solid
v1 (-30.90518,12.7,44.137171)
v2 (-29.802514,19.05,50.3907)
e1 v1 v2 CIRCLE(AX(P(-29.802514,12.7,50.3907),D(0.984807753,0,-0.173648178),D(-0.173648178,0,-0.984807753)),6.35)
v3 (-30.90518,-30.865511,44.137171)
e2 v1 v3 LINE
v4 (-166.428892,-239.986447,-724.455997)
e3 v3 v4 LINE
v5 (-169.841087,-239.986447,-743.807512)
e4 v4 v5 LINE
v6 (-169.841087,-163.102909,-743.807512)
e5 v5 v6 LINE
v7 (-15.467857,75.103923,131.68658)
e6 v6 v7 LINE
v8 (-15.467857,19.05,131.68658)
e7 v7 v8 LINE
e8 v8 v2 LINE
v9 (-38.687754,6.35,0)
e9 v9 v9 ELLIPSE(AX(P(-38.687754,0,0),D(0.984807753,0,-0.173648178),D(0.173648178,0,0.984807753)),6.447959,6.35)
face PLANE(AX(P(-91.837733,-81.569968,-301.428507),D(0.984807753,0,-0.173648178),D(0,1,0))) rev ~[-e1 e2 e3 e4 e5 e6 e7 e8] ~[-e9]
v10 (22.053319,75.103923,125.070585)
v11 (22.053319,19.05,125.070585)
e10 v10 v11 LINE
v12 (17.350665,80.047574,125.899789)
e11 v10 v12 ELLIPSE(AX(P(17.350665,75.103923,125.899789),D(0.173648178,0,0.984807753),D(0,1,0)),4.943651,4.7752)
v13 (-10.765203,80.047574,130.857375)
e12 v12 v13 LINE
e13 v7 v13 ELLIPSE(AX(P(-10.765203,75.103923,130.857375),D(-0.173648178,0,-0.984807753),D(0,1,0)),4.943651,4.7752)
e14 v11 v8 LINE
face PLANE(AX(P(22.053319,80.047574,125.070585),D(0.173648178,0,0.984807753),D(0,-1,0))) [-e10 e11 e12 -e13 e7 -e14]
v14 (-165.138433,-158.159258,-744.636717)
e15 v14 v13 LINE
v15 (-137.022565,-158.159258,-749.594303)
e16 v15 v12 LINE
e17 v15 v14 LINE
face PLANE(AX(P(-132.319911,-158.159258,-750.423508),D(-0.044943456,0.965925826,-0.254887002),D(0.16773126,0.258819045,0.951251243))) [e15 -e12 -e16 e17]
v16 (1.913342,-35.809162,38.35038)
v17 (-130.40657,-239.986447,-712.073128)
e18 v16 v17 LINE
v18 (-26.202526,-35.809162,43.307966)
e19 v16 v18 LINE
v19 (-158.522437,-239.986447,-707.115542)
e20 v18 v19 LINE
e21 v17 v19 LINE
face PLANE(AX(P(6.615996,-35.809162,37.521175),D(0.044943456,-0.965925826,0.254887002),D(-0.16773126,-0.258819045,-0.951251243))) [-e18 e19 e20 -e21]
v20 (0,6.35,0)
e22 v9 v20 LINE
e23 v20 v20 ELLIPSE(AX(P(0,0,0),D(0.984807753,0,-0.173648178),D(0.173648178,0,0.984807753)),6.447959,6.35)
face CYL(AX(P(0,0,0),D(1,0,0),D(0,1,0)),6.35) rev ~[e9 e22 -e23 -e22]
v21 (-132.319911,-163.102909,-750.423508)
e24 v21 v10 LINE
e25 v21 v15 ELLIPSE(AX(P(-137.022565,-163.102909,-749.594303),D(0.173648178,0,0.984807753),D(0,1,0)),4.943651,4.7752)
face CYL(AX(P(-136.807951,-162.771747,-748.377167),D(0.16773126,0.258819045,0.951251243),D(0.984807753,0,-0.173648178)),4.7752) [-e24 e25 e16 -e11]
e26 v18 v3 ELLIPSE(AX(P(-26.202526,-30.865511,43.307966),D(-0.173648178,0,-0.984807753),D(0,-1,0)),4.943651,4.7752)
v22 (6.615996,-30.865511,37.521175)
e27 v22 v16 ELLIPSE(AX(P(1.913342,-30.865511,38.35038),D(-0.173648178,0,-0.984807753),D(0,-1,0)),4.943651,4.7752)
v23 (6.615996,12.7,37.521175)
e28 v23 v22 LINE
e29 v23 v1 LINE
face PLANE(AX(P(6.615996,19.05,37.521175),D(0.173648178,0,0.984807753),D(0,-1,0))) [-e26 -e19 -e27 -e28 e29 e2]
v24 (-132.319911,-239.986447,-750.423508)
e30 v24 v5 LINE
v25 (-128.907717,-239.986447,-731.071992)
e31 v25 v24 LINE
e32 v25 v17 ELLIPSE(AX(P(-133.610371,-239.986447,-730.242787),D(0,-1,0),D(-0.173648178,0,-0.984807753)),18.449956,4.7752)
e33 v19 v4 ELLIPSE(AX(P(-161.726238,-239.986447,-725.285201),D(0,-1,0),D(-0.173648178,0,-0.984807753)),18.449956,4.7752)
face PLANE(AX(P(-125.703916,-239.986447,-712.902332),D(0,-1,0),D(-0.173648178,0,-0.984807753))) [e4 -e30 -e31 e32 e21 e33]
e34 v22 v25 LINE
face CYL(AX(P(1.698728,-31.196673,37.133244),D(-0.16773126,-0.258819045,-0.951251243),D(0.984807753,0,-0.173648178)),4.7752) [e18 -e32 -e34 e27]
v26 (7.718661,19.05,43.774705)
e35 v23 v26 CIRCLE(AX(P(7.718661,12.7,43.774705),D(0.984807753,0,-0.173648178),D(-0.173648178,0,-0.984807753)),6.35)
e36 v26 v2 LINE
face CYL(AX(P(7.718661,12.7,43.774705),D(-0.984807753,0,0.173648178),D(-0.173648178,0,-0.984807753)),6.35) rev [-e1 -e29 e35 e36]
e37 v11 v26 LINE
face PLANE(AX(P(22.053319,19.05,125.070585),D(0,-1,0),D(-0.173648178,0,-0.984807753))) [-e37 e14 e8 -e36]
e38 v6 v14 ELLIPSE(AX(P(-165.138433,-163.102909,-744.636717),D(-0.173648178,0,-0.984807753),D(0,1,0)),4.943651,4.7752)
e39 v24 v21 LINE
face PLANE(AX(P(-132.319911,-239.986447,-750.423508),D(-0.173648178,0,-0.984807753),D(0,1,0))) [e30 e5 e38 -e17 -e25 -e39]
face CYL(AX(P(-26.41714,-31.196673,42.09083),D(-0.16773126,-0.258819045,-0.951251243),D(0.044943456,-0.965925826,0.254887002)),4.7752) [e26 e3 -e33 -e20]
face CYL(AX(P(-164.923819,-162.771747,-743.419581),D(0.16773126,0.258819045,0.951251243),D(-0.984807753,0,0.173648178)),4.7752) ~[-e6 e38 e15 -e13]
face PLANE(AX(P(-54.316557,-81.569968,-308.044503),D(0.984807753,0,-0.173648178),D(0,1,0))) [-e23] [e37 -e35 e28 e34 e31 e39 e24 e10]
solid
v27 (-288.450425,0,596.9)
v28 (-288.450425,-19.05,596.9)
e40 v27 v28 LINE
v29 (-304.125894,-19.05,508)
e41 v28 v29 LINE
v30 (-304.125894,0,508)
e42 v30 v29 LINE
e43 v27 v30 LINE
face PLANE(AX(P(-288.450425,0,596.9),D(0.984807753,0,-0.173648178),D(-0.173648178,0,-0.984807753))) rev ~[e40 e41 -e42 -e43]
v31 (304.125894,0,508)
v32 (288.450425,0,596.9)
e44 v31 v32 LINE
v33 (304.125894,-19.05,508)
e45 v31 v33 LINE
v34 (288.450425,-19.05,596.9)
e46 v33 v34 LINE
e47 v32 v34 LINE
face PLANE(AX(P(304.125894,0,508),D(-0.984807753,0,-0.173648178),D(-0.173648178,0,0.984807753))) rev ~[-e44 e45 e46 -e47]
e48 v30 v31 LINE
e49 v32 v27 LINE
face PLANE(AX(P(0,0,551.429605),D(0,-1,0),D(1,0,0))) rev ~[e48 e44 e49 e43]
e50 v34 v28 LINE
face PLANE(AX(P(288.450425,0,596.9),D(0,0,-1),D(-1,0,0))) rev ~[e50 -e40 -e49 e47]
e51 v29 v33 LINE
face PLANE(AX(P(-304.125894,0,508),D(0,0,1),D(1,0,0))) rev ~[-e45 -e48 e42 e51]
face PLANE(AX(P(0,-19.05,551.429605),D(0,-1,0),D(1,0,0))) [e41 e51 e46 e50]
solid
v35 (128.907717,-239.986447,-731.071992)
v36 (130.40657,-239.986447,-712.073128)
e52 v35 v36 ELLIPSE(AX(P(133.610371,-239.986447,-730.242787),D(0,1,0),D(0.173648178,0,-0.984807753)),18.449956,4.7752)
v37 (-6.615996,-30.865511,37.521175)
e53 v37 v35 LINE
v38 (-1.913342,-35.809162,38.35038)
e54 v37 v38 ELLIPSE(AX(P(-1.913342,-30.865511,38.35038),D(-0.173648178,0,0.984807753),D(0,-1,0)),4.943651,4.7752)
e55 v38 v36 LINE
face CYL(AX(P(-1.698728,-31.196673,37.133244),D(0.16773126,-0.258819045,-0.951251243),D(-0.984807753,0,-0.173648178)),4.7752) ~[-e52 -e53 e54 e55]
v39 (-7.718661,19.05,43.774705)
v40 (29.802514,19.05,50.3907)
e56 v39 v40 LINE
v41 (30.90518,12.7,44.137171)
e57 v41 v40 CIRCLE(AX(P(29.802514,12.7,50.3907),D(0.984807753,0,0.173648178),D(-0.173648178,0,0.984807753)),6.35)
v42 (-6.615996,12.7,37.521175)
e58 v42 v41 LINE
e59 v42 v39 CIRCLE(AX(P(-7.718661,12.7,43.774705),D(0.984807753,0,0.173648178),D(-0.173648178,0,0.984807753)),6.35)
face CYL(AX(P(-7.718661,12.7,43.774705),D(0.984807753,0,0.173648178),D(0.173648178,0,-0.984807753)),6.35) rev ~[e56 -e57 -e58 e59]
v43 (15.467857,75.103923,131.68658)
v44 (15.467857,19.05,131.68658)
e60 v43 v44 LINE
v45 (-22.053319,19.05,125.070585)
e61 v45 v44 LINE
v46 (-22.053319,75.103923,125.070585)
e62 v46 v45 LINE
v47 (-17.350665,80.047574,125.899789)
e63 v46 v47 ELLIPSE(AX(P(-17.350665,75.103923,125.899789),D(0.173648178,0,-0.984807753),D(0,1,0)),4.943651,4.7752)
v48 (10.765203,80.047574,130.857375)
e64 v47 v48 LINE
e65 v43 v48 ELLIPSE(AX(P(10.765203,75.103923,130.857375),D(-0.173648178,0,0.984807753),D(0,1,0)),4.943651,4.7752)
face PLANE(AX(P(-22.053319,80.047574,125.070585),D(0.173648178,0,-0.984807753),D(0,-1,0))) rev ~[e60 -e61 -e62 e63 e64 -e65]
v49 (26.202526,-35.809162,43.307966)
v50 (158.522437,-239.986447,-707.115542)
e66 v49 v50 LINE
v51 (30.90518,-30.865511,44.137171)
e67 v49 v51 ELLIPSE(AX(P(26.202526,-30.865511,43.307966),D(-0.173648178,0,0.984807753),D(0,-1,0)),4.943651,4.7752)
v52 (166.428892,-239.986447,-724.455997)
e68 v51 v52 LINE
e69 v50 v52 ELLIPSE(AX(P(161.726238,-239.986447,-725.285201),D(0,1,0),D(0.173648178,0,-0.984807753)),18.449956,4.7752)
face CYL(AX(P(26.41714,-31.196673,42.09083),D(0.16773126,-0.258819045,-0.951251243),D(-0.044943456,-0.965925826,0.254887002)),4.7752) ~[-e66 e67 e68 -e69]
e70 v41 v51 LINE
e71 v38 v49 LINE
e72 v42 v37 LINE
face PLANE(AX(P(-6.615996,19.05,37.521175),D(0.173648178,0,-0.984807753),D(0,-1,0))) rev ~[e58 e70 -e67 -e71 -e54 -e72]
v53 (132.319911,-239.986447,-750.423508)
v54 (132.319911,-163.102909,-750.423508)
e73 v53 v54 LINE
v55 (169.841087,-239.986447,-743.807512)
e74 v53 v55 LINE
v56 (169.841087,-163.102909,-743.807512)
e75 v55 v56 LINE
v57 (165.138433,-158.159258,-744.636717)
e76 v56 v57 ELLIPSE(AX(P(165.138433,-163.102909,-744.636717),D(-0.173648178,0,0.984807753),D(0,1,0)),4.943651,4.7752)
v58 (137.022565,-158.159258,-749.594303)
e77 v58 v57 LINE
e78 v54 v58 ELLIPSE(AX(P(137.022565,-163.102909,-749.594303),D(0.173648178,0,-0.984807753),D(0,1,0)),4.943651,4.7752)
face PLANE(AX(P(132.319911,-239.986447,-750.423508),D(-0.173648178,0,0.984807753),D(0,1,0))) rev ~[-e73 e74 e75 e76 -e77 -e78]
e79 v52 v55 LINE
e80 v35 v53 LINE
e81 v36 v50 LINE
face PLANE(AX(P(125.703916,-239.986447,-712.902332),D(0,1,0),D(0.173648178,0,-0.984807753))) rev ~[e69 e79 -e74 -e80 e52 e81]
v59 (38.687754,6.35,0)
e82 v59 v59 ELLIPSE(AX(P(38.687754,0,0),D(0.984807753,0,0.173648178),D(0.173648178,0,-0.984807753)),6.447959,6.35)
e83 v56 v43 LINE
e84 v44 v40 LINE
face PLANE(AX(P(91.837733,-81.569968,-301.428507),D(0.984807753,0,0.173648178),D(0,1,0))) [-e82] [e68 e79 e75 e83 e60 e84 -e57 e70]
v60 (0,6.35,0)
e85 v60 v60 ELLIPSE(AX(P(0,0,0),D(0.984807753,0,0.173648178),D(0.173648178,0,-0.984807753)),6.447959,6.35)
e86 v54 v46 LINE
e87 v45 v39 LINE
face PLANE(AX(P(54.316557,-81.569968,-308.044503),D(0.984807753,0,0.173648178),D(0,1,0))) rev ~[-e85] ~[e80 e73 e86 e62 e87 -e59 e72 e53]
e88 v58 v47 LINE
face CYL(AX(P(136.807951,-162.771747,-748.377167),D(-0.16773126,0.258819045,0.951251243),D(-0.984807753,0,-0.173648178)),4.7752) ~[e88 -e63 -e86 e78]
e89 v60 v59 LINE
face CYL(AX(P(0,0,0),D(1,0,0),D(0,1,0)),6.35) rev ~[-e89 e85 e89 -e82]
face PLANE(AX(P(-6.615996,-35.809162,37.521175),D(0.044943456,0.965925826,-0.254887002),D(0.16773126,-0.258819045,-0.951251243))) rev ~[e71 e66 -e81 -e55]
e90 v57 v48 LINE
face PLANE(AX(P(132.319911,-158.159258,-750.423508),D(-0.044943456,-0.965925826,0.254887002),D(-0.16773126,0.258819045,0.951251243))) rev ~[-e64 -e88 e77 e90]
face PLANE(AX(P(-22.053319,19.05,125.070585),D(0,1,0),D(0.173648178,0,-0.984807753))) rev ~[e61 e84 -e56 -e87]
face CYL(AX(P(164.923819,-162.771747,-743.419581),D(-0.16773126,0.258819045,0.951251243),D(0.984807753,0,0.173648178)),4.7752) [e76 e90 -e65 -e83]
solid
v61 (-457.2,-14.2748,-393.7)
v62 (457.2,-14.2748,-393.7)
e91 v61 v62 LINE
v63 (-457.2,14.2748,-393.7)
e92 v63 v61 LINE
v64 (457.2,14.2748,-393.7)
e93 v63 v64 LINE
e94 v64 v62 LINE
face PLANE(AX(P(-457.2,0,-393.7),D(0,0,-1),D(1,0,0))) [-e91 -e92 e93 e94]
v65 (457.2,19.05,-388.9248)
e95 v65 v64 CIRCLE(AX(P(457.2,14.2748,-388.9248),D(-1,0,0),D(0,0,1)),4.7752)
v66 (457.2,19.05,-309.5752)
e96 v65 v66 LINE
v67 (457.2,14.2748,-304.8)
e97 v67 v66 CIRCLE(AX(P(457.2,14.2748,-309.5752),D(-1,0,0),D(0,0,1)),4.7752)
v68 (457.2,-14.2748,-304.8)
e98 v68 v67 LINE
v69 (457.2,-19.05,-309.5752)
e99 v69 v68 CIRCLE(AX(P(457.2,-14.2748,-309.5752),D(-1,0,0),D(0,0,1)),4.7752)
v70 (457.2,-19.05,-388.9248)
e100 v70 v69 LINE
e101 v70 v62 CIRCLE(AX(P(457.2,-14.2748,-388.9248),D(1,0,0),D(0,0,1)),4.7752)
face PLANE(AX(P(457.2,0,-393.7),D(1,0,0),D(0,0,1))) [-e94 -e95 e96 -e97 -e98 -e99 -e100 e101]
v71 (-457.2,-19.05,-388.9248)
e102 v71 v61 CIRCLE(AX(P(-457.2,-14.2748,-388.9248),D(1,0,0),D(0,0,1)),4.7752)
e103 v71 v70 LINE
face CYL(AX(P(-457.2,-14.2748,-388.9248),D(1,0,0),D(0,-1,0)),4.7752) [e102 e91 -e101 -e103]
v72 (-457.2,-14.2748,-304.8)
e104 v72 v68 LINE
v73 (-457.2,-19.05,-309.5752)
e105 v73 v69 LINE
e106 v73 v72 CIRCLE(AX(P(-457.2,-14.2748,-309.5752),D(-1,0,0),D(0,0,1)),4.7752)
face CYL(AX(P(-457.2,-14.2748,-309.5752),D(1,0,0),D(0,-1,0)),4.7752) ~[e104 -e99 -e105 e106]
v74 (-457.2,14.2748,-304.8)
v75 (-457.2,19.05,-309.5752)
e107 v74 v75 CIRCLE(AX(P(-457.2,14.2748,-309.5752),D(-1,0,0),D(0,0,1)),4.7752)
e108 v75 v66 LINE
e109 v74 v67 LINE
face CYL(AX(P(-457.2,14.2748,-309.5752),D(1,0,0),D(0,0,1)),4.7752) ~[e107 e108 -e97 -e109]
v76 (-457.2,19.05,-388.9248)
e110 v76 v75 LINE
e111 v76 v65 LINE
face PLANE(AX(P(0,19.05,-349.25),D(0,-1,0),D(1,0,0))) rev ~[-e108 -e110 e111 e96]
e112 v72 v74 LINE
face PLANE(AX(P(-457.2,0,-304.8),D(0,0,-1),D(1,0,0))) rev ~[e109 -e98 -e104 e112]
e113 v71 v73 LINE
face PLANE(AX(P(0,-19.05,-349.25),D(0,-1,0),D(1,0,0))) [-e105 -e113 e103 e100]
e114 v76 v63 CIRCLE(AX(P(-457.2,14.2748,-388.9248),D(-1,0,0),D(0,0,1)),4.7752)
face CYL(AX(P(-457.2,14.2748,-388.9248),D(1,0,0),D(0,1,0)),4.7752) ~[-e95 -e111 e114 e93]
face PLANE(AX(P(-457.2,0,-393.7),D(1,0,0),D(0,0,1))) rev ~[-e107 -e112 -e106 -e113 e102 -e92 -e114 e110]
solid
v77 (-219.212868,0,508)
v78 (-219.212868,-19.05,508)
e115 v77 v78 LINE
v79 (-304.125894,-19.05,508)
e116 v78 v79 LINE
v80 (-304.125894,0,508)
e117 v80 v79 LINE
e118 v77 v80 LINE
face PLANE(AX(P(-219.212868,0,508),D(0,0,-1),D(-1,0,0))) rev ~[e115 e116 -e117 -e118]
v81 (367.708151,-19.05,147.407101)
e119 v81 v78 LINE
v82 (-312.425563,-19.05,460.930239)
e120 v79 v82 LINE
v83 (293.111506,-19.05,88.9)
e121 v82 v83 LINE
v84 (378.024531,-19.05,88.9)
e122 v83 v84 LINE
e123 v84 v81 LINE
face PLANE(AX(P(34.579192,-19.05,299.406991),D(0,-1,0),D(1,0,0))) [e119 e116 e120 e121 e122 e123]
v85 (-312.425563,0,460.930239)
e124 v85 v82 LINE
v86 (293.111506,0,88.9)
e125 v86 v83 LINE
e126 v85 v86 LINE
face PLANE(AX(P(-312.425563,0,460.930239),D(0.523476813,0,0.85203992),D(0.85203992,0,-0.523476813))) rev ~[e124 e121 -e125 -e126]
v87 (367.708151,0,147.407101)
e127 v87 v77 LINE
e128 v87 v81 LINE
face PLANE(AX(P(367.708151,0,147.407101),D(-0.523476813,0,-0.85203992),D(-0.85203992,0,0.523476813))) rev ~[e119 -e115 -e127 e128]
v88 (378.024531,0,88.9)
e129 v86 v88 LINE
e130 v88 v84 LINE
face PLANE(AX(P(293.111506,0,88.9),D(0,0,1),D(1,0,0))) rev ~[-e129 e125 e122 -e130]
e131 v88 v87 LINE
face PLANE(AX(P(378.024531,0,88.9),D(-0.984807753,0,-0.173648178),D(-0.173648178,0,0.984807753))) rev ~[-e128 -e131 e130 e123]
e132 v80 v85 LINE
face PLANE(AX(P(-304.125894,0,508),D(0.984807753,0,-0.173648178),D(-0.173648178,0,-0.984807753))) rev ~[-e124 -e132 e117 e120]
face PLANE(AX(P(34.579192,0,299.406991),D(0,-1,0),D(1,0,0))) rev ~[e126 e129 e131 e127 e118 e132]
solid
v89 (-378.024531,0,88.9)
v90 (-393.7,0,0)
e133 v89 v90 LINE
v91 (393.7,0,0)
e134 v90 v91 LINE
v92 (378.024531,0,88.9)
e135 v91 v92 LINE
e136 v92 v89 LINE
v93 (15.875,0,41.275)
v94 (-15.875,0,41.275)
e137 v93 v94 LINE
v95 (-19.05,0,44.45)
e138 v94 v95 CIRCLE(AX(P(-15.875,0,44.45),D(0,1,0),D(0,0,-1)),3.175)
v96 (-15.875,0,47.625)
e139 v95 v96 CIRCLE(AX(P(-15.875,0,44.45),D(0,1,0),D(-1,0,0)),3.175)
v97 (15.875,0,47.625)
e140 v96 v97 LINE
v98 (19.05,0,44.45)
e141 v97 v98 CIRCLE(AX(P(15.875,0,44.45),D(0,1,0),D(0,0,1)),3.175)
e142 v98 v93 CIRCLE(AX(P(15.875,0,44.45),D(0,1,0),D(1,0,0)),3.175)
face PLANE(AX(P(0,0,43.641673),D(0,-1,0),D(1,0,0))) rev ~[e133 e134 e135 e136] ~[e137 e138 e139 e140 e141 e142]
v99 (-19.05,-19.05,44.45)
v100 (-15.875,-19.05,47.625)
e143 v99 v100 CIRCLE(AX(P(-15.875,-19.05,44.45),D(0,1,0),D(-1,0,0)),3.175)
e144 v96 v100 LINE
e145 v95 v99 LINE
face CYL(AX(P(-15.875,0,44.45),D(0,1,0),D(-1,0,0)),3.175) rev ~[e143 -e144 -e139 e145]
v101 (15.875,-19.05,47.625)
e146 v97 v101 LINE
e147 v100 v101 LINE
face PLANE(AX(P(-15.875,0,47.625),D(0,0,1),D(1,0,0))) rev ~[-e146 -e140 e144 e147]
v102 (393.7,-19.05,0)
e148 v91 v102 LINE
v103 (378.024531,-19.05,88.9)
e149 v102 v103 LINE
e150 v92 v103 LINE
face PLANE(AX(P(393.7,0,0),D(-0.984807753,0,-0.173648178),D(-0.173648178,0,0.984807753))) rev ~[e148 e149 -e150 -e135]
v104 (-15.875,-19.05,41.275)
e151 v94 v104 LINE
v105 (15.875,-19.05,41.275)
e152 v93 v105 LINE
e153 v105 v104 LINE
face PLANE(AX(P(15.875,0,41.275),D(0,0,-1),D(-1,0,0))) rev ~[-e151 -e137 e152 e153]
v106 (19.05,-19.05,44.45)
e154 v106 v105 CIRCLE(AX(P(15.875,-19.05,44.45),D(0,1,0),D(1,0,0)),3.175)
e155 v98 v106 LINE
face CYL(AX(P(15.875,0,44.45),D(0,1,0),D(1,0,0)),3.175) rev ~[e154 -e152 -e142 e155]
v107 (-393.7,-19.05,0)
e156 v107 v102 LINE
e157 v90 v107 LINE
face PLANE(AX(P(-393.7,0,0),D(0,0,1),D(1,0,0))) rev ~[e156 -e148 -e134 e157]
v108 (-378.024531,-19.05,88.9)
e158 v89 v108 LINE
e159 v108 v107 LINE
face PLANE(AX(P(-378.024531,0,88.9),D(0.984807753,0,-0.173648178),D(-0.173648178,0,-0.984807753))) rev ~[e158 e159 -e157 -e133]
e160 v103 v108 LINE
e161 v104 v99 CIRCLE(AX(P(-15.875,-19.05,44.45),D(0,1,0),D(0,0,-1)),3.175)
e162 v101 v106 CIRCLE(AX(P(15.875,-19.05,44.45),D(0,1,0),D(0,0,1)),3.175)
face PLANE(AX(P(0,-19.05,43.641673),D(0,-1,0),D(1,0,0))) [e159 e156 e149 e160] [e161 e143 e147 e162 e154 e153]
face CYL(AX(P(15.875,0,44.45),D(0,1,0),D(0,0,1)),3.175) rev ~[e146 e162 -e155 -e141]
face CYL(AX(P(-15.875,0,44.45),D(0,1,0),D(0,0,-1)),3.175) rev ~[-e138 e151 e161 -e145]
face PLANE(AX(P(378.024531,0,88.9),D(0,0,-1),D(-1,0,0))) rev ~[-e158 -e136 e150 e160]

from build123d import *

# Parameters (mm, degrees)
F5_DEPTH      = 38.1
F6_DEPTH      = 38.1
F7_R          = 6.35
F7_2_R        = 6.35
F8_R          = 6.35
F9_DEPTH      = 169.842086772
F9_DEPTH_BACK = 169.842086772
F11_DEPTH     = 19.05
F13_DEPTH     = 19.05
F15_DEPTH     = 19.05
F16_W         = 914.4
F16_H         = 88.9
F17_DEPTH     = 19.05
F18_R         = 4.7752
F18_2_R       = 4.7752
F18_3_R       = 4.7752


with BuildPart() as f5:
    # F3 (on line) → F5 (new body)
    with BuildSketch(Plane(origin=(0, 0, 0), x_dir=(0, 1, 0), z_dir=(0.984807753, 0, 0.1736481777))):
        Polygon((19.05, 38.1), (-35.8091619876, 38.1), (-239.9864466201, -723.9), (-239.9864466201, -762), (-158.1592584133, -762), (80.047573658, 127), (19.05, 127), align=None)
    extrude(amount=F5_DEPTH)

    # F7
    f7_edges = [f5.edges().sort_by_distance(p)[0] for p in [
        (12.144592, 19.05, 40.829173),
    ]]
    fillet(f7_edges, radius=F7_R)


with BuildPart() as f6:
    # F4 (on line) → F6 (new body)
    with BuildSketch(Plane(origin=(0, 0, 0), x_dir=(0, 1, 0), z_dir=(0.984807753, 0, -0.1736481777))):
        Polygon((19.05, 38.1), (-35.8091619876, 38.1), (-239.9864466201, -723.9), (-239.9864466201, -762), (-158.1592584133, -762), (80.047573658, 127), (19.05, 127), align=None)
    extrude(amount=-F6_DEPTH)

    # F7#2
    f7_2_edges = [f6.edges().sort_by_distance(p)[0] for p in [
        (-12.144592, 19.05, 40.829173),
    ]]
    fillet(f7_2_edges, radius=F7_2_R)


with BuildPart() as f9_tool:
    # F8 (on Right) → F9 (new body, two sides)
    with BuildSketch(Plane.YZ) as f9_sk:
        Circle(F8_R)
    extrude(amount=F9_DEPTH)
    extrude(f9_sk.sketch, amount=-F9_DEPTH_BACK)


with BuildPart() as f5_1:
    add(f5.part)

    # F9: cut by f9_tool
    add(f9_tool.part, mode=Mode.SUBTRACT)

    # F18
    f18_edges = [f5_1.edges().sort_by_distance(p)[0] for p in [
        (97.065136, -137.897804, -331.074583),
        (59.54396, -137.897804, -337.690579),
        (92.654472, -39.055842, -306.060466),
        (55.133296, -39.055842, -312.676462),
        (11.041926, 19.05, 47.082702),
    ]]
    fillet(f18_edges, radius=F18_R)


with BuildPart() as f6_1:
    add(f6.part)

    # F9: cut by f9_tool
    add(f9_tool.part, mode=Mode.SUBTRACT)

    # F18#2
    f18_2_edges = [f6_1.edges().sort_by_distance(p)[0] for p in [
        (-59.54396, -137.897804, -337.690579),
        (-55.133296, -39.055842, -312.676462),
        (-97.065136, -137.897804, -331.074583),
        (-92.654472, -39.055842, -306.060466),
    ]]
    fillet(f18_2_edges, radius=F18_2_R)


with BuildPart() as f11:
    # F10 (on Front) → F11 (new body)
    with BuildSketch(Plane.XZ):
        Polygon((378.024531415, 88.9), (-378.024531415, 88.9), (-393.7, 0), (393.7, 0), align=None)
        with BuildLine():
            ThreePointArc((19.05, 44.45), (18.1200640303, 42.2049359697), (15.875, 41.275))
            Line((15.875, 41.275), (-15.875, 41.275))
            ThreePointArc((-15.875, 41.275), (-18.1200640303, 42.2049359697), (-19.05, 44.45))
            ThreePointArc((-19.05, 44.45), (-18.1200640303, 46.6950640303), (-15.875, 47.625))
            Line((-15.875, 47.625), (15.875, 47.625))
            ThreePointArc((15.875, 47.625), (18.1200640303, 46.6950640303), (19.05, 44.45))
        make_face(mode=Mode.SUBTRACT)
    extrude(amount=F11_DEPTH)


with BuildPart() as f13:
    # F12 (on Front) → F13 (new body)
    with BuildSketch(Plane.XZ):
        Polygon((288.4504252151, 596.9), (-288.4504252151, 596.9), (-304.1258938001, 508), (304.1258938001, 508), align=None)
    extrude(amount=F13_DEPTH)


with BuildPart() as f15:
    # F14 (on Front) → F15 (new body)
    with BuildSketch(Plane.XZ):
        Polygon((-219.2128682677, 508), (-304.1258938001, 508), (-312.4255627119, 460.9302385914), (293.1115058827, 88.9), (378.024531415, 88.9), (367.708150879, 147.4071013782), align=None)
    extrude(amount=F15_DEPTH)


with BuildPart() as f17:
    # F16 (on Front) → F17 (new body, symmetric)
    with BuildSketch(Plane.XZ):
        with Locations((0, -349.25)):
            Rectangle(F16_W, F16_H)
    extrude(amount=F17_DEPTH, both=True)

    # F18#3
    f18_3_edges = [f17.edges().sort_by_distance(p)[0] for p in [
        (0, -19.05, -393.7),
        (0, -19.05, -304.8),
        (0, 19.05, -393.7),
        (0, 19.05, -304.8),
    ]]
    fillet(f18_3_edges, radius=F18_3_R)


solid = Compound([f5_1.part, f6_1.part, f11.part, f13.part, f15.part, f17.part])
